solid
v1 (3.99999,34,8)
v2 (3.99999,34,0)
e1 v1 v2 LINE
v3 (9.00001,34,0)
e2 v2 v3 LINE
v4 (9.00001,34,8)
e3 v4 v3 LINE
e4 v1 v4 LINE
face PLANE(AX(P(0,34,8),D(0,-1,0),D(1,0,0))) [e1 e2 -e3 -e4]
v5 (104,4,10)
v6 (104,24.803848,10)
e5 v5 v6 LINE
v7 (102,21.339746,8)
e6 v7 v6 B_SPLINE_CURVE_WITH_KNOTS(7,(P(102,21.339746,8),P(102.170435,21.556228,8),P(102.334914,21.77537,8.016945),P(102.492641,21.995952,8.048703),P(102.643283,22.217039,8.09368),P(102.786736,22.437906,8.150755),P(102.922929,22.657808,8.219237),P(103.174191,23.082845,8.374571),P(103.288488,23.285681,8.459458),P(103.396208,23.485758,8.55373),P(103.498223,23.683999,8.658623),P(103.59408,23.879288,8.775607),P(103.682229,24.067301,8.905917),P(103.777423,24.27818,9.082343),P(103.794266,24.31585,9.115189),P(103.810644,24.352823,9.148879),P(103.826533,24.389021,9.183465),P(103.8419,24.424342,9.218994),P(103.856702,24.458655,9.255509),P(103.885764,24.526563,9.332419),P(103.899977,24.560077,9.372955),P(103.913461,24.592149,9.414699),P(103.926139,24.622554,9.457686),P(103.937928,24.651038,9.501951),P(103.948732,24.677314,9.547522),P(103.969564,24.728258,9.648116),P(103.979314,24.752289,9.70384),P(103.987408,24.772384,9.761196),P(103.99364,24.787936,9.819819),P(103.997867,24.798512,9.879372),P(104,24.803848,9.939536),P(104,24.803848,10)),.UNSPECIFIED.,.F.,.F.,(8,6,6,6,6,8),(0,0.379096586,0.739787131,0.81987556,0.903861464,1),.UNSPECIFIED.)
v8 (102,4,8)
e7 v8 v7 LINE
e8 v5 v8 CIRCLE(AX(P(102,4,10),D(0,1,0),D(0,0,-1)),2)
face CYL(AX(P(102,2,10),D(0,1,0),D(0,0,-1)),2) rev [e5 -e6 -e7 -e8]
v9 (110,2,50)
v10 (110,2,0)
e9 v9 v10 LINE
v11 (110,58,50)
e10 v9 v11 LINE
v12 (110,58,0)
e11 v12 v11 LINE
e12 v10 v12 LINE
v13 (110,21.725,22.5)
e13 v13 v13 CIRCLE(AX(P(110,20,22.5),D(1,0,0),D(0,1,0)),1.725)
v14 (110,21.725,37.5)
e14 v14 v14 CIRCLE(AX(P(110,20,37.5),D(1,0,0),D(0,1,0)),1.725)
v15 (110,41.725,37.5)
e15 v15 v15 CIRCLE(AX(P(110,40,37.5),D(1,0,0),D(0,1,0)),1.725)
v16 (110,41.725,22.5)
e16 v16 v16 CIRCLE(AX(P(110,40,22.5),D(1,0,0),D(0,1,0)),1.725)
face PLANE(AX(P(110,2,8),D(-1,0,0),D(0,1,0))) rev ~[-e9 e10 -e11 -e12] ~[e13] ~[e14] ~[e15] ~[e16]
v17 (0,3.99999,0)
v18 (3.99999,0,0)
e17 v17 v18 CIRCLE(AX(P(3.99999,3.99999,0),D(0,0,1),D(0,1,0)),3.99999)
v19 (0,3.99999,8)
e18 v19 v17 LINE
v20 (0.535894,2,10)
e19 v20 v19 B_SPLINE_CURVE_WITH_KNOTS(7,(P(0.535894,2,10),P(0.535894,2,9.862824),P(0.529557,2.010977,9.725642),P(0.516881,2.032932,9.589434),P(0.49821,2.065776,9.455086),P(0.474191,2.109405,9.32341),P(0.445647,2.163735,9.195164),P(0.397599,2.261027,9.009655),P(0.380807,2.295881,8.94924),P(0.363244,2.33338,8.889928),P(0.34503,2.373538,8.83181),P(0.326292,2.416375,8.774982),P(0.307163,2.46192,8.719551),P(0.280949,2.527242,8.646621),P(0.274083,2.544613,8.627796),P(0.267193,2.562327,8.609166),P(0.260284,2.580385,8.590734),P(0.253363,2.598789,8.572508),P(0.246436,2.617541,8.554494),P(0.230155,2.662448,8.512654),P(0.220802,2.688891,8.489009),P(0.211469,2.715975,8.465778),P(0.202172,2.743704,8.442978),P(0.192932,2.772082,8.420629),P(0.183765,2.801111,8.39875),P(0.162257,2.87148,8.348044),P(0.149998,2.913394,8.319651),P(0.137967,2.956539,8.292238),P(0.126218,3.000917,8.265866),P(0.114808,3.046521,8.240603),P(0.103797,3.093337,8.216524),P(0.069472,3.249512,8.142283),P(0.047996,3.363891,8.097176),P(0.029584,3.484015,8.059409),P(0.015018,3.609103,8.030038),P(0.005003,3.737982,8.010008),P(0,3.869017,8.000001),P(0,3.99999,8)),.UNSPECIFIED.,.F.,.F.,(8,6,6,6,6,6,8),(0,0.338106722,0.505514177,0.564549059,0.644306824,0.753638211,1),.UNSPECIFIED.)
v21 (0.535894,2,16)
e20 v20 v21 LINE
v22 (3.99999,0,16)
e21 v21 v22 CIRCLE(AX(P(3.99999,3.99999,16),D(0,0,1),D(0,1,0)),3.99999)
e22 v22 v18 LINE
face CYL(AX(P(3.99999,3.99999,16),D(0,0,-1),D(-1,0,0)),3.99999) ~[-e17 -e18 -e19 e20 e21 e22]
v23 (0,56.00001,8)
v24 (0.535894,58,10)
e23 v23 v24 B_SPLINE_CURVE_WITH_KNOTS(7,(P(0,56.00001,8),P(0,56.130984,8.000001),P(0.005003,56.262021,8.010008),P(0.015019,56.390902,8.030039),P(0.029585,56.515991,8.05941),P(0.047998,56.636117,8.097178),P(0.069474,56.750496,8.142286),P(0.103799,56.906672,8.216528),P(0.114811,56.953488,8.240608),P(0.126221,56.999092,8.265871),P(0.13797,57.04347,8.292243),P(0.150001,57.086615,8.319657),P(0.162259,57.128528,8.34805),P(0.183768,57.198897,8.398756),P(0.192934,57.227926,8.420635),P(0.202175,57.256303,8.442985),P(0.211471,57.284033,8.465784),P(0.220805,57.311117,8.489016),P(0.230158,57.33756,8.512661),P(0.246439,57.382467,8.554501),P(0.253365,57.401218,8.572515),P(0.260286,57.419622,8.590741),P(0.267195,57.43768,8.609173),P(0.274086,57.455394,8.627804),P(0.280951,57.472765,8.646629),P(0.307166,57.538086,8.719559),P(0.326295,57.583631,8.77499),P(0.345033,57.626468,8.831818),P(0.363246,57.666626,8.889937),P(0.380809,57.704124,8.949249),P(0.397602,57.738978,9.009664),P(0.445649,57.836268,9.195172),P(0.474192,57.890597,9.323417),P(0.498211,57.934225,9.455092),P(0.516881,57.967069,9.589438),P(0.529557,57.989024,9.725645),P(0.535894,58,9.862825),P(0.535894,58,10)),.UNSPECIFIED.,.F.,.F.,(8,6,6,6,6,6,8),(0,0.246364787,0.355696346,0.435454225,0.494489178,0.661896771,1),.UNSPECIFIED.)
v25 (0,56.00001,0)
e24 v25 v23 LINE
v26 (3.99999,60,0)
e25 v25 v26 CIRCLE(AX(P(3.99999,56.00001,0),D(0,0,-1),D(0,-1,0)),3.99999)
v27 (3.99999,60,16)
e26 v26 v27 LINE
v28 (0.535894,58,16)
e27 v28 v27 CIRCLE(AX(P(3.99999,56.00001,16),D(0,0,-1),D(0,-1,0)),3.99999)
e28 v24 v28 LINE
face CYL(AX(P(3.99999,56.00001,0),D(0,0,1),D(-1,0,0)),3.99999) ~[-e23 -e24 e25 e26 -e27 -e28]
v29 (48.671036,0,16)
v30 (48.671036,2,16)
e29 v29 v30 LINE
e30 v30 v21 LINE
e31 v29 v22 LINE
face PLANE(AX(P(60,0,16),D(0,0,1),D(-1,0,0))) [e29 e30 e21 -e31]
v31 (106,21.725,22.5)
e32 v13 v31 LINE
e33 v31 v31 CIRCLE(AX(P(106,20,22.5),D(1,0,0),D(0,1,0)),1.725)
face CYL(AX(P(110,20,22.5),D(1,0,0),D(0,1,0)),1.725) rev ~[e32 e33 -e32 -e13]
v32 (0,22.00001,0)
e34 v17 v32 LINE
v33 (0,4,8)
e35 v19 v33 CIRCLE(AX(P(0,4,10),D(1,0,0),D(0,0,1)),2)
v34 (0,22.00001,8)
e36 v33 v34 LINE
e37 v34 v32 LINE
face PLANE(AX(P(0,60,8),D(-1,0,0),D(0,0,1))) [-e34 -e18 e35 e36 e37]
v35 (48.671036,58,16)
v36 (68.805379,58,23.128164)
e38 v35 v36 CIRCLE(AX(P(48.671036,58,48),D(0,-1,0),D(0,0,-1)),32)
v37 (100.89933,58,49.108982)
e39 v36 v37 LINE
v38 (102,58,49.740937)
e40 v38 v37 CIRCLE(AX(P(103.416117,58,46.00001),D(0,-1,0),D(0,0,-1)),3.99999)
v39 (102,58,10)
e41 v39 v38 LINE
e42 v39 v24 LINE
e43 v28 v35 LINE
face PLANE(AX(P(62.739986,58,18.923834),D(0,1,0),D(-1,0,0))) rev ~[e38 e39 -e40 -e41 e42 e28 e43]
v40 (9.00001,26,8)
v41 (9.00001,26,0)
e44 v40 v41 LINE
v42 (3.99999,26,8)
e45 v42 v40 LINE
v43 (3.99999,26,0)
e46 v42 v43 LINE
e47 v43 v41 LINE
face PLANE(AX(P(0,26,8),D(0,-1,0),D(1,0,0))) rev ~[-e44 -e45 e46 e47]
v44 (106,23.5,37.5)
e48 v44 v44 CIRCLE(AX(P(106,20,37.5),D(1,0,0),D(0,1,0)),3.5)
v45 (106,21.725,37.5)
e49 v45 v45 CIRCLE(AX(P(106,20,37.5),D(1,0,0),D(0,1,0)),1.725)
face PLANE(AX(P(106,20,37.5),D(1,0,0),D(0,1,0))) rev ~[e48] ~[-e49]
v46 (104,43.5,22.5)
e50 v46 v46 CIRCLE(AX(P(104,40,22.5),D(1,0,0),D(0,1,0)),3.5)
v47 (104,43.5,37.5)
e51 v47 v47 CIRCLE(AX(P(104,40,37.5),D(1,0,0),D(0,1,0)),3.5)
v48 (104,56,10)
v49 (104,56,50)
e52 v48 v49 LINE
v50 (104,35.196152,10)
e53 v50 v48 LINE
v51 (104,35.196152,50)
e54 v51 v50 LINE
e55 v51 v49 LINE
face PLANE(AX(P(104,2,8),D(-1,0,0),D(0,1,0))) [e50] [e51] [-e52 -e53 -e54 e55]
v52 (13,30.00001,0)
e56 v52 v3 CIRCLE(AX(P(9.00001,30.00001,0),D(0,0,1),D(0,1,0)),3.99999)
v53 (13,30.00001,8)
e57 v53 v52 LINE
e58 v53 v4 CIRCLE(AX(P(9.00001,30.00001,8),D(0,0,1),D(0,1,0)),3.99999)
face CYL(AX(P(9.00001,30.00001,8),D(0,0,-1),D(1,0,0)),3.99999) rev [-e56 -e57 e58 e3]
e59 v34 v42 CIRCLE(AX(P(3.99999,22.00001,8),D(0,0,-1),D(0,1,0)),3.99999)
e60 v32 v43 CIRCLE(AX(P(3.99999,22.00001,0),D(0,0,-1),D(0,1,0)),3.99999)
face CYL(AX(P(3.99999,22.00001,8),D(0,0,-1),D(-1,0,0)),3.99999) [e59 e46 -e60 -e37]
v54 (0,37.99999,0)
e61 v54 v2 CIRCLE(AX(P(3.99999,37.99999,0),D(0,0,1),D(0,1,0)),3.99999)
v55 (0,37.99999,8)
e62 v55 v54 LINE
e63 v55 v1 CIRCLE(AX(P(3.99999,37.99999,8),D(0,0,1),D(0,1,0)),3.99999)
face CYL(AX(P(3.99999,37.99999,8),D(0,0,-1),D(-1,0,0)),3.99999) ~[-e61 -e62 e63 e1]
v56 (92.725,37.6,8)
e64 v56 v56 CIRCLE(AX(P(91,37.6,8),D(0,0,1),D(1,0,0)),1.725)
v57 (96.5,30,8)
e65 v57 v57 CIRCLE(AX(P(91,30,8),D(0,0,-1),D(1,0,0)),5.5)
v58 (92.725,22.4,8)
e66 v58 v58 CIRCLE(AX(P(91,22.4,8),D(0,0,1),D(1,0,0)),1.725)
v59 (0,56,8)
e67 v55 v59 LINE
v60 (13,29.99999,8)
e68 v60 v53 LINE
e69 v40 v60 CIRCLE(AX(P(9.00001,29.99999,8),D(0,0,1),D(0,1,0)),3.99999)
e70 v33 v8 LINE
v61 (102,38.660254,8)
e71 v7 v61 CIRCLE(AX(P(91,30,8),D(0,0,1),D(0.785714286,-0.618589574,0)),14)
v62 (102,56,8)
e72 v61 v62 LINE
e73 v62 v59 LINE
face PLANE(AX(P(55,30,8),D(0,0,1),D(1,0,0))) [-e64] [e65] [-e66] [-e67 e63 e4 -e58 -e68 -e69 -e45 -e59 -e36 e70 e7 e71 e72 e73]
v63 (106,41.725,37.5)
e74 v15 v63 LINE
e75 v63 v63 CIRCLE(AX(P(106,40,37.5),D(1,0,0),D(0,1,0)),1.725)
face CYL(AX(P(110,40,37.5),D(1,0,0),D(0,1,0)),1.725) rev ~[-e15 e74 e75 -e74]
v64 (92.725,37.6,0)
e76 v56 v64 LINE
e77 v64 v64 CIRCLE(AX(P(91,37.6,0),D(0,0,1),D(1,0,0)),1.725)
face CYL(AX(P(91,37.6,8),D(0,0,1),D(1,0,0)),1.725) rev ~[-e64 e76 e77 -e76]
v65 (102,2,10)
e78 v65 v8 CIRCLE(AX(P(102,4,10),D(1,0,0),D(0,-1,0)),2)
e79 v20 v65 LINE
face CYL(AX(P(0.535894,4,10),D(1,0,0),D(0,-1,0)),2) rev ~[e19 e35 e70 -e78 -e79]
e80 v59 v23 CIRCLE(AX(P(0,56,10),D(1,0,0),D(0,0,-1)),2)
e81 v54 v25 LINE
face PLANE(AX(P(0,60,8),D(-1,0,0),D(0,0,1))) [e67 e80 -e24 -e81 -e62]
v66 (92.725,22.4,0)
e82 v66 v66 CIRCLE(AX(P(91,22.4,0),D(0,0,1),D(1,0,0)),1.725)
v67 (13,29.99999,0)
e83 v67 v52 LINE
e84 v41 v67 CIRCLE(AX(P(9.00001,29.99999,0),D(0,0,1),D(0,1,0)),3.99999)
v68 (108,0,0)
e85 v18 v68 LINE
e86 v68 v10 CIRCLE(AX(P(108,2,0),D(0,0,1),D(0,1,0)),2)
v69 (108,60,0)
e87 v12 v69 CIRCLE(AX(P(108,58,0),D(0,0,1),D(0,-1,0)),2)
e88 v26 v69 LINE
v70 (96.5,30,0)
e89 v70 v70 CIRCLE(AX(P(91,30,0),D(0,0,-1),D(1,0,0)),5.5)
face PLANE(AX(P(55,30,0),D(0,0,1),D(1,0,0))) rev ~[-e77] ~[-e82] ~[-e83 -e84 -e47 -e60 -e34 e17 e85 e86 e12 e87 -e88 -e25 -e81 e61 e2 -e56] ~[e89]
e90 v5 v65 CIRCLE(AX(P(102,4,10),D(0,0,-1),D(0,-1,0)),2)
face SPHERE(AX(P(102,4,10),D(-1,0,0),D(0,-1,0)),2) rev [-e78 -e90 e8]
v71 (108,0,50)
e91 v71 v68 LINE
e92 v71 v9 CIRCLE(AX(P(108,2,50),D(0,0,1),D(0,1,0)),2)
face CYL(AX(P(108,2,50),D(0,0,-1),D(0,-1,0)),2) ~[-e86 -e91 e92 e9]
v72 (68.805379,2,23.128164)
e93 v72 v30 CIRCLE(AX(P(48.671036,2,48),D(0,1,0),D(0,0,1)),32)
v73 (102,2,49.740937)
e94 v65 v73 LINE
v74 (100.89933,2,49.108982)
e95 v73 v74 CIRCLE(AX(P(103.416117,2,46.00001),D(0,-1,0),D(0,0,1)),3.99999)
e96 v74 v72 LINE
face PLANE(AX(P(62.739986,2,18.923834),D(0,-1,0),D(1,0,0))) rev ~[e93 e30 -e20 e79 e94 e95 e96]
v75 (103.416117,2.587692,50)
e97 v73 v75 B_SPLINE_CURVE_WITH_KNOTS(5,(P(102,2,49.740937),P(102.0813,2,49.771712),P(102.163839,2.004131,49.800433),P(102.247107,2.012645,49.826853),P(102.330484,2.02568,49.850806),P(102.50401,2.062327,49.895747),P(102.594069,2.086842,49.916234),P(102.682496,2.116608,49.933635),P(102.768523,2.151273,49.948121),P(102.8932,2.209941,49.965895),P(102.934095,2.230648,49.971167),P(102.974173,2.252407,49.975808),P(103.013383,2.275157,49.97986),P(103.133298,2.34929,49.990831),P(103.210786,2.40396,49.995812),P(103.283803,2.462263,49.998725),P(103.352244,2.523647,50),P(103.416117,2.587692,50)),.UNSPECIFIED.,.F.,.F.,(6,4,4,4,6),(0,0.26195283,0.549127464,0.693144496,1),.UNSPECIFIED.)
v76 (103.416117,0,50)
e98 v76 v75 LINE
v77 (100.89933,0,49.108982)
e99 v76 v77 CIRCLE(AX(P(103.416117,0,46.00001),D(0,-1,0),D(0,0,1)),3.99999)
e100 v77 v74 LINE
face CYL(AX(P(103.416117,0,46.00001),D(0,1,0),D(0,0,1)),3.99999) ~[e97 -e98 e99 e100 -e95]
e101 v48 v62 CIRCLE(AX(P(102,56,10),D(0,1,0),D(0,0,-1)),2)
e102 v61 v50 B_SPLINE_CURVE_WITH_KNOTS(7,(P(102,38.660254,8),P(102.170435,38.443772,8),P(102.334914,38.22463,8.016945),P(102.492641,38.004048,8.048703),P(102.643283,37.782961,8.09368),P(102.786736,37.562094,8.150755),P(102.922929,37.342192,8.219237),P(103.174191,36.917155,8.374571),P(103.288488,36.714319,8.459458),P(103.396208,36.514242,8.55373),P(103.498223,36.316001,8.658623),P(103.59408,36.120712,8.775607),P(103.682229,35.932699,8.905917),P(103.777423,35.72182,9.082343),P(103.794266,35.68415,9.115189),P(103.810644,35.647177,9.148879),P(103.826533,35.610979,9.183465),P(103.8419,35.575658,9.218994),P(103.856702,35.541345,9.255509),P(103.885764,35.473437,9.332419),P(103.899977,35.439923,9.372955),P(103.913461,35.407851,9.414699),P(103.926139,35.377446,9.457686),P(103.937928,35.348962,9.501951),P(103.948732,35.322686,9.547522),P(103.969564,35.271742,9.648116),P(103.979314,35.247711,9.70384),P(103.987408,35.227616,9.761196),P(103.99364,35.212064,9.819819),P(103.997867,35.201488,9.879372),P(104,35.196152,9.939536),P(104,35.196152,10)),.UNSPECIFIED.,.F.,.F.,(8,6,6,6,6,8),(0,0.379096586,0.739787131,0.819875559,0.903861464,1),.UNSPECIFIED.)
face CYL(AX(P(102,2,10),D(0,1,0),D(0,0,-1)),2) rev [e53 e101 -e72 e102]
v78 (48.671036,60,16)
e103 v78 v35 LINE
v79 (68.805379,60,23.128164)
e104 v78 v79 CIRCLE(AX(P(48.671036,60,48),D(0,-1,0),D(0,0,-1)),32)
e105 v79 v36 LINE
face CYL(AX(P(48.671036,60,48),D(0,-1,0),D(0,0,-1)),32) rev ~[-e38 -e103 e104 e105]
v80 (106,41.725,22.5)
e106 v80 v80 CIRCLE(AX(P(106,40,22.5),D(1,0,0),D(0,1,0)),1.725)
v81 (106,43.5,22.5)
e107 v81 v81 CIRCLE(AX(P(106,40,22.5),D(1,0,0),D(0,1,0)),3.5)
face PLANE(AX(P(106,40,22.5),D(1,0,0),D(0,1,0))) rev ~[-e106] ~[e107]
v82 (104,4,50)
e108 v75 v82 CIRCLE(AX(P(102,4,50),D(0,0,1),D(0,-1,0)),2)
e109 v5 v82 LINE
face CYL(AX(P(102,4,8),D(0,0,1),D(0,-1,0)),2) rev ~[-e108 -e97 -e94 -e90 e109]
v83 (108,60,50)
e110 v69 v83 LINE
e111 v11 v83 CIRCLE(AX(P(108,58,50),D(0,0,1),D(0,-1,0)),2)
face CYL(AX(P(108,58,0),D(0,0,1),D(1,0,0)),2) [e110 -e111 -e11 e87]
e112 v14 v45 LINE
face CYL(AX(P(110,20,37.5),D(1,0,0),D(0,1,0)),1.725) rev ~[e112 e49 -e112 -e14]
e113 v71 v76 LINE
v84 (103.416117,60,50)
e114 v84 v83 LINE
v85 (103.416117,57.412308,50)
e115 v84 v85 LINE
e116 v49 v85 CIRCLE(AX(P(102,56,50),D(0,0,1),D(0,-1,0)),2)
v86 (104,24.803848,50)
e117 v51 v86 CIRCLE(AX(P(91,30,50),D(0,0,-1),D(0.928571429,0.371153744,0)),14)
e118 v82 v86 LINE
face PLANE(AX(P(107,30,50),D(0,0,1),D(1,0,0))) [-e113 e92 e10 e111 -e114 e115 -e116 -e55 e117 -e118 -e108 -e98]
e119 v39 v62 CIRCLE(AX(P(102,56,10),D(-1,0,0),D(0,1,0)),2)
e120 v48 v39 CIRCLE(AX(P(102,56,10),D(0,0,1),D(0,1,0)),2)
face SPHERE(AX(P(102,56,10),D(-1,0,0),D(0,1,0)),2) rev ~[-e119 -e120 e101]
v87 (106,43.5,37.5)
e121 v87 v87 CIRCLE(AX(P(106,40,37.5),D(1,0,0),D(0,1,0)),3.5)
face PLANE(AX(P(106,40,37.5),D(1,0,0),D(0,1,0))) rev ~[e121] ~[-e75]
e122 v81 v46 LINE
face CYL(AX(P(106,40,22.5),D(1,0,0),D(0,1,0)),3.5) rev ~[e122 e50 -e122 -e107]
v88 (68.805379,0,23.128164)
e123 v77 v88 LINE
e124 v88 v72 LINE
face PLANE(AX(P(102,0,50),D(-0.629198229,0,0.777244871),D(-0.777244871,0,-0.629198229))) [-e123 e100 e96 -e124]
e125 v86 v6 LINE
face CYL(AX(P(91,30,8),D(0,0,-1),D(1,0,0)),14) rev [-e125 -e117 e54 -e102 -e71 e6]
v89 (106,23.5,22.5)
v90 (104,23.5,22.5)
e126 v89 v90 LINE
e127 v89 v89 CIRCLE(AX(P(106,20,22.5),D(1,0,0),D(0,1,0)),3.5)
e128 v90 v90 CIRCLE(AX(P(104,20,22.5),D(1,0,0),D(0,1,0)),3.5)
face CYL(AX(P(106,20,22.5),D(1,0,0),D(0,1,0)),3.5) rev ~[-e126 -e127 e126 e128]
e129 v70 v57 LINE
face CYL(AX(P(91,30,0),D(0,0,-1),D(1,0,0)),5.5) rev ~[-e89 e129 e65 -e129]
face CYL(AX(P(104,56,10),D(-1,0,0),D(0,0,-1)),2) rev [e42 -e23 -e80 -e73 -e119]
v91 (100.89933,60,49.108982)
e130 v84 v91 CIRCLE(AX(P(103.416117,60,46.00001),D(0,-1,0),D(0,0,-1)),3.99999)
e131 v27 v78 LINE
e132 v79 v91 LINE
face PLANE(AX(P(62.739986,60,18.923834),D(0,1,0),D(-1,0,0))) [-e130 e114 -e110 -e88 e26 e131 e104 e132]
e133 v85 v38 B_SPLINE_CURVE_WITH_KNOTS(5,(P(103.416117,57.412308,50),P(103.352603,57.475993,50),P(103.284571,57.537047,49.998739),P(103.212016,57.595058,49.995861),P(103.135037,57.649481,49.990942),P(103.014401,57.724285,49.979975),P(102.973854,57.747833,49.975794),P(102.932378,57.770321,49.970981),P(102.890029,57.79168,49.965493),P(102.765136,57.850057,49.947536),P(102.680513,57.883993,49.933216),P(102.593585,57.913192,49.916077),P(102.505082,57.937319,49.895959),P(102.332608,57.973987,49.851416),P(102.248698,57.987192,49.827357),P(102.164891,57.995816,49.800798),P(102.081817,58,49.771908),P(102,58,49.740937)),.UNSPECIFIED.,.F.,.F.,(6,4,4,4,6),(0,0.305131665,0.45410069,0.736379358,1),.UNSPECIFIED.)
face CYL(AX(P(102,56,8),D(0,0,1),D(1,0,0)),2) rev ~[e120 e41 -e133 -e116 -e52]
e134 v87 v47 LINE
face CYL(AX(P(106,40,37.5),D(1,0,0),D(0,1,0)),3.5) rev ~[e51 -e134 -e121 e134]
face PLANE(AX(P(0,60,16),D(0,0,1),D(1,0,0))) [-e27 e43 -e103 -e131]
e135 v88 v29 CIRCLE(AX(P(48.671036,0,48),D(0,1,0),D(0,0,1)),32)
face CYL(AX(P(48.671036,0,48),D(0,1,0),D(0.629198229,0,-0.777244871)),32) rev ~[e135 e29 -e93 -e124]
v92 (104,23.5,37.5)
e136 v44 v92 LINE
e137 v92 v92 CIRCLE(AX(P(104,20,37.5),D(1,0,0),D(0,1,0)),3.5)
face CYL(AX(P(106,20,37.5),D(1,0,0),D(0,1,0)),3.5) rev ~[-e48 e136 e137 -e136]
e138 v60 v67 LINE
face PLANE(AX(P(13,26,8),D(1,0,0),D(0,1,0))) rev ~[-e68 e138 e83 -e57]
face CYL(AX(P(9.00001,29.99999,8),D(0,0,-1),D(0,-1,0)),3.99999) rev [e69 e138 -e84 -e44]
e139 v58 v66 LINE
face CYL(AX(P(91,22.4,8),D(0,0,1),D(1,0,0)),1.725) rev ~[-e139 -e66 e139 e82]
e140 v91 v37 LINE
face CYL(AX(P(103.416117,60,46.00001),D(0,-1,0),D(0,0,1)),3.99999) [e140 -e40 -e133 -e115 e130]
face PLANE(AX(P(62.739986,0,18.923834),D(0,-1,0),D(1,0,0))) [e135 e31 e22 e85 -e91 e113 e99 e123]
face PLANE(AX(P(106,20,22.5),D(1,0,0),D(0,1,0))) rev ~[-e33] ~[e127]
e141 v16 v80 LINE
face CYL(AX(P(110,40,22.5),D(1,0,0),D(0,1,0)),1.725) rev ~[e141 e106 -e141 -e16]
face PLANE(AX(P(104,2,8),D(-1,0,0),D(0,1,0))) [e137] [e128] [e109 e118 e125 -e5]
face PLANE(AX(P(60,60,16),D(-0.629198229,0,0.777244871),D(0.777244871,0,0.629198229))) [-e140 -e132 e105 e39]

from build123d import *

# Parameters (mm, degrees)
F0_W      = 110
F0_H      = 60
F1_DEPTH  = 8
F3_DEPTH  = 2
F5_DEPTH  = 2
F6_W      = 6
F6_H      = 56
F7_DEPTH  = 42
F8_W      = 13
F8_H      = 8
F9_DEPTH  = 8
F10_R     = 3.99999
F11_R     = 2
F12_R     = 1.725
F13_DEPTH = 6
F12_R_2   = 3.5
F14_DEPTH = 3
F17_R     = 5.5
F18_DEPTH = 8
F19_R     = 1.725
F20_DEPTH = 8
F19_R_2   = 14
F21_DEPTH = 55
F22_R     = 32


# Not quite as in the source:
# - a fillet or chamfer is up to 0.001 mm smaller than in the source, because OpenCascade refuses the exact size


with BuildPart() as f1:
    # F0 (on Top) → F1 (new body)
    with BuildSketch(Plane.XY):
        with Locations((55, 30)):
            Rectangle(F0_W, F0_H)
    extrude(amount=F1_DEPTH)

    # F2 (on face) → F3 (join)
    with BuildSketch(Plane.XZ):
        Polygon((0, 8), (110, 8), (110, 50), (102, 50), (60, 16), (0, 16), align=None)
    extrude(amount=-F3_DEPTH)

    # F4 (on face) → F5 (join)
    with BuildSketch(Plane(origin=(0, 60, 0), x_dir=(-1, 0, 0), z_dir=(0, 1, 0))):
        Polygon((-110, 50), (-110, 8), (0, 8), (0, 16), (-60, 16), (-102, 50), align=None)
    extrude(amount=-F5_DEPTH)

    # F6 (on face) → F7 (join)
    with BuildSketch(Plane.XY.offset(8)):
        with Locations((107, 30)):
            Rectangle(F6_W, F6_H)
    extrude(amount=F7_DEPTH)

    # F8 (on face) → F9 (cut)
    with BuildSketch(Plane.XY.offset(8)):
        with Locations((6.5, 30)):
            Rectangle(F8_W, F8_H)
    extrude(amount=-F9_DEPTH, mode=Mode.SUBTRACT)

    # F10 (radius 4 in the source; OpenCascade refuses exactly that, so slightly less here)
    f10_edges = [f1.edges().sort_by_distance(p)[0] for p in [
        (102, 59, 50),
        (102, 1, 50),
        (0, 60, 8),
        (0, 34, 4),
        (0, 26, 4),
        (13, 26, 4),
        (13, 34, 4),
        (0, 0, 8),
    ]]
    fillet(f10_edges, radius=F10_R)

    # F11
    f11_edges = [f1.edges().sort_by_distance(p)[0] for p in [
        (52.267947, 58, 8),
        (52.267947, 2, 8),
        (110, 0, 25),
        (110, 60, 25),
        (104, 2, 29),
        (104, 58, 29),
        (104, 30, 8),
    ]]
    fillet(f11_edges, radius=F11_R)

    # F12 (on face) → F13 (cut)
    with BuildSketch(Plane.YZ.offset(110)):
        with Locations((20, 37.5)):
            Circle(F12_R)
        with Locations((40, 22.5)):
            Circle(F12_R)
        with Locations((20, 22.5)):
            Circle(F12_R)
        with Locations((40, 37.5)):
            Circle(F12_R)
    extrude(amount=-F13_DEPTH, mode=Mode.SUBTRACT)


with BuildPart() as f14:
    # F12 (on face) → F14 (new body)
    with BuildSketch(Plane.YZ.offset(110)):
        with Locations((20, 22.5)):
            Circle(F12_R_2)
        with Locations((20, 22.5)):
            Circle(F12_R, mode=Mode.SUBTRACT)
    extrude(amount=-F14_DEPTH)


with BuildPart() as f14b:
    # F12 (on face) → F14, piece 2 (new body)
    with BuildSketch(Plane.YZ.offset(110)):
        with Locations((40, 22.5)):
            Circle(F12_R_2)
        with Locations((40, 22.5)):
            Circle(F12_R, mode=Mode.SUBTRACT)
    extrude(amount=-F14_DEPTH)


with BuildPart() as f14c:
    # F12 (on face) → F14, piece 3 (new body)
    with BuildSketch(Plane.YZ.offset(110)):
        with Locations((40, 37.5)):
            Circle(F12_R_2)
        with Locations((40, 37.5)):
            Circle(F12_R, mode=Mode.SUBTRACT)
    extrude(amount=-F14_DEPTH)


with BuildPart() as f14d:
    # F12 (on face) → F14, piece 4 (new body)
    with BuildSketch(Plane.YZ.offset(110)):
        with Locations((20, 37.5)):
            Circle(F12_R_2)
        with Locations((20, 37.5)):
            Circle(F12_R, mode=Mode.SUBTRACT)
    extrude(amount=-F14_DEPTH)


with BuildPart() as f14d_1:
    # F15: moved
    add(f14d.part.moved(Location((-4, 0, 0))))


with BuildPart() as f14c_1:
    # F15: moved
    add(f14c.part.moved(Location((-4, 0, 0))))


with BuildPart() as f14b_1:
    # F15: moved
    add(f14b.part.moved(Location((-4, 0, 0))))


with BuildPart() as f14_1:
    # F15: moved
    add(f14.part.moved(Location((-4, 0, 0))))


with BuildPart() as f1_1:
    add(f1.part)

    # F16: cut F14d, F14c, F14b, F14
    add(f14d_1.part, mode=Mode.SUBTRACT)
    add(f14c_1.part, mode=Mode.SUBTRACT)
    add(f14b_1.part, mode=Mode.SUBTRACT)
    add(f14_1.part, mode=Mode.SUBTRACT)

    # F17 (on face) → F18 (cut)
    with BuildSketch(Plane(origin=(0, 0, 0), x_dir=(1, 0, 0), z_dir=(0, 0, -1))):
        with Locations((91, -30)):
            Circle(F17_R)
    extrude(amount=-F18_DEPTH, mode=Mode.SUBTRACT)

    # F19 (on face) → F20 (cut)
    with BuildSketch(Plane.XY.offset(8)):
        with Locations((91, 37.6)):
            Circle(F19_R)
        with Locations((91, 22.4)):
            Circle(F19_R)
    extrude(amount=-F20_DEPTH, mode=Mode.SUBTRACT)

    # F19 (on face) → F21 (cut)
    with BuildSketch(Plane.XY.offset(8)):
        with Locations((91, 30)):
            Circle(F19_R_2)
        with Locations((91, 22.4)):
            Circle(F19_R, mode=Mode.SUBTRACT)
        with Locations((83.4, 30)):
            Circle(F19_R, mode=Mode.SUBTRACT)
        with Locations((91, 37.6)):
            Circle(F19_R, mode=Mode.SUBTRACT)
        with Locations((98.6, 30)):
            Circle(F19_R, mode=Mode.SUBTRACT)
        with Locations((-18, 77.4)):
            Circle(F19_R)
        with Locations((-77.4, -18)):
            Circle(F19_R)
        with Locations((18, -77.4)):
            Circle(F19_R)
        with Locations((98.6, 30)):
            Circle(F19_R)
    extrude(amount=F21_DEPTH, mode=Mode.SUBTRACT)

    # F22
    f22_edges = [f1_1.edges().sort_by_distance(p)[0] for p in [
        (60, 59, 16),
        (60, 1, 16),
    ]]
    fillet(f22_edges, radius=F22_R)


solid = f1_1.part
